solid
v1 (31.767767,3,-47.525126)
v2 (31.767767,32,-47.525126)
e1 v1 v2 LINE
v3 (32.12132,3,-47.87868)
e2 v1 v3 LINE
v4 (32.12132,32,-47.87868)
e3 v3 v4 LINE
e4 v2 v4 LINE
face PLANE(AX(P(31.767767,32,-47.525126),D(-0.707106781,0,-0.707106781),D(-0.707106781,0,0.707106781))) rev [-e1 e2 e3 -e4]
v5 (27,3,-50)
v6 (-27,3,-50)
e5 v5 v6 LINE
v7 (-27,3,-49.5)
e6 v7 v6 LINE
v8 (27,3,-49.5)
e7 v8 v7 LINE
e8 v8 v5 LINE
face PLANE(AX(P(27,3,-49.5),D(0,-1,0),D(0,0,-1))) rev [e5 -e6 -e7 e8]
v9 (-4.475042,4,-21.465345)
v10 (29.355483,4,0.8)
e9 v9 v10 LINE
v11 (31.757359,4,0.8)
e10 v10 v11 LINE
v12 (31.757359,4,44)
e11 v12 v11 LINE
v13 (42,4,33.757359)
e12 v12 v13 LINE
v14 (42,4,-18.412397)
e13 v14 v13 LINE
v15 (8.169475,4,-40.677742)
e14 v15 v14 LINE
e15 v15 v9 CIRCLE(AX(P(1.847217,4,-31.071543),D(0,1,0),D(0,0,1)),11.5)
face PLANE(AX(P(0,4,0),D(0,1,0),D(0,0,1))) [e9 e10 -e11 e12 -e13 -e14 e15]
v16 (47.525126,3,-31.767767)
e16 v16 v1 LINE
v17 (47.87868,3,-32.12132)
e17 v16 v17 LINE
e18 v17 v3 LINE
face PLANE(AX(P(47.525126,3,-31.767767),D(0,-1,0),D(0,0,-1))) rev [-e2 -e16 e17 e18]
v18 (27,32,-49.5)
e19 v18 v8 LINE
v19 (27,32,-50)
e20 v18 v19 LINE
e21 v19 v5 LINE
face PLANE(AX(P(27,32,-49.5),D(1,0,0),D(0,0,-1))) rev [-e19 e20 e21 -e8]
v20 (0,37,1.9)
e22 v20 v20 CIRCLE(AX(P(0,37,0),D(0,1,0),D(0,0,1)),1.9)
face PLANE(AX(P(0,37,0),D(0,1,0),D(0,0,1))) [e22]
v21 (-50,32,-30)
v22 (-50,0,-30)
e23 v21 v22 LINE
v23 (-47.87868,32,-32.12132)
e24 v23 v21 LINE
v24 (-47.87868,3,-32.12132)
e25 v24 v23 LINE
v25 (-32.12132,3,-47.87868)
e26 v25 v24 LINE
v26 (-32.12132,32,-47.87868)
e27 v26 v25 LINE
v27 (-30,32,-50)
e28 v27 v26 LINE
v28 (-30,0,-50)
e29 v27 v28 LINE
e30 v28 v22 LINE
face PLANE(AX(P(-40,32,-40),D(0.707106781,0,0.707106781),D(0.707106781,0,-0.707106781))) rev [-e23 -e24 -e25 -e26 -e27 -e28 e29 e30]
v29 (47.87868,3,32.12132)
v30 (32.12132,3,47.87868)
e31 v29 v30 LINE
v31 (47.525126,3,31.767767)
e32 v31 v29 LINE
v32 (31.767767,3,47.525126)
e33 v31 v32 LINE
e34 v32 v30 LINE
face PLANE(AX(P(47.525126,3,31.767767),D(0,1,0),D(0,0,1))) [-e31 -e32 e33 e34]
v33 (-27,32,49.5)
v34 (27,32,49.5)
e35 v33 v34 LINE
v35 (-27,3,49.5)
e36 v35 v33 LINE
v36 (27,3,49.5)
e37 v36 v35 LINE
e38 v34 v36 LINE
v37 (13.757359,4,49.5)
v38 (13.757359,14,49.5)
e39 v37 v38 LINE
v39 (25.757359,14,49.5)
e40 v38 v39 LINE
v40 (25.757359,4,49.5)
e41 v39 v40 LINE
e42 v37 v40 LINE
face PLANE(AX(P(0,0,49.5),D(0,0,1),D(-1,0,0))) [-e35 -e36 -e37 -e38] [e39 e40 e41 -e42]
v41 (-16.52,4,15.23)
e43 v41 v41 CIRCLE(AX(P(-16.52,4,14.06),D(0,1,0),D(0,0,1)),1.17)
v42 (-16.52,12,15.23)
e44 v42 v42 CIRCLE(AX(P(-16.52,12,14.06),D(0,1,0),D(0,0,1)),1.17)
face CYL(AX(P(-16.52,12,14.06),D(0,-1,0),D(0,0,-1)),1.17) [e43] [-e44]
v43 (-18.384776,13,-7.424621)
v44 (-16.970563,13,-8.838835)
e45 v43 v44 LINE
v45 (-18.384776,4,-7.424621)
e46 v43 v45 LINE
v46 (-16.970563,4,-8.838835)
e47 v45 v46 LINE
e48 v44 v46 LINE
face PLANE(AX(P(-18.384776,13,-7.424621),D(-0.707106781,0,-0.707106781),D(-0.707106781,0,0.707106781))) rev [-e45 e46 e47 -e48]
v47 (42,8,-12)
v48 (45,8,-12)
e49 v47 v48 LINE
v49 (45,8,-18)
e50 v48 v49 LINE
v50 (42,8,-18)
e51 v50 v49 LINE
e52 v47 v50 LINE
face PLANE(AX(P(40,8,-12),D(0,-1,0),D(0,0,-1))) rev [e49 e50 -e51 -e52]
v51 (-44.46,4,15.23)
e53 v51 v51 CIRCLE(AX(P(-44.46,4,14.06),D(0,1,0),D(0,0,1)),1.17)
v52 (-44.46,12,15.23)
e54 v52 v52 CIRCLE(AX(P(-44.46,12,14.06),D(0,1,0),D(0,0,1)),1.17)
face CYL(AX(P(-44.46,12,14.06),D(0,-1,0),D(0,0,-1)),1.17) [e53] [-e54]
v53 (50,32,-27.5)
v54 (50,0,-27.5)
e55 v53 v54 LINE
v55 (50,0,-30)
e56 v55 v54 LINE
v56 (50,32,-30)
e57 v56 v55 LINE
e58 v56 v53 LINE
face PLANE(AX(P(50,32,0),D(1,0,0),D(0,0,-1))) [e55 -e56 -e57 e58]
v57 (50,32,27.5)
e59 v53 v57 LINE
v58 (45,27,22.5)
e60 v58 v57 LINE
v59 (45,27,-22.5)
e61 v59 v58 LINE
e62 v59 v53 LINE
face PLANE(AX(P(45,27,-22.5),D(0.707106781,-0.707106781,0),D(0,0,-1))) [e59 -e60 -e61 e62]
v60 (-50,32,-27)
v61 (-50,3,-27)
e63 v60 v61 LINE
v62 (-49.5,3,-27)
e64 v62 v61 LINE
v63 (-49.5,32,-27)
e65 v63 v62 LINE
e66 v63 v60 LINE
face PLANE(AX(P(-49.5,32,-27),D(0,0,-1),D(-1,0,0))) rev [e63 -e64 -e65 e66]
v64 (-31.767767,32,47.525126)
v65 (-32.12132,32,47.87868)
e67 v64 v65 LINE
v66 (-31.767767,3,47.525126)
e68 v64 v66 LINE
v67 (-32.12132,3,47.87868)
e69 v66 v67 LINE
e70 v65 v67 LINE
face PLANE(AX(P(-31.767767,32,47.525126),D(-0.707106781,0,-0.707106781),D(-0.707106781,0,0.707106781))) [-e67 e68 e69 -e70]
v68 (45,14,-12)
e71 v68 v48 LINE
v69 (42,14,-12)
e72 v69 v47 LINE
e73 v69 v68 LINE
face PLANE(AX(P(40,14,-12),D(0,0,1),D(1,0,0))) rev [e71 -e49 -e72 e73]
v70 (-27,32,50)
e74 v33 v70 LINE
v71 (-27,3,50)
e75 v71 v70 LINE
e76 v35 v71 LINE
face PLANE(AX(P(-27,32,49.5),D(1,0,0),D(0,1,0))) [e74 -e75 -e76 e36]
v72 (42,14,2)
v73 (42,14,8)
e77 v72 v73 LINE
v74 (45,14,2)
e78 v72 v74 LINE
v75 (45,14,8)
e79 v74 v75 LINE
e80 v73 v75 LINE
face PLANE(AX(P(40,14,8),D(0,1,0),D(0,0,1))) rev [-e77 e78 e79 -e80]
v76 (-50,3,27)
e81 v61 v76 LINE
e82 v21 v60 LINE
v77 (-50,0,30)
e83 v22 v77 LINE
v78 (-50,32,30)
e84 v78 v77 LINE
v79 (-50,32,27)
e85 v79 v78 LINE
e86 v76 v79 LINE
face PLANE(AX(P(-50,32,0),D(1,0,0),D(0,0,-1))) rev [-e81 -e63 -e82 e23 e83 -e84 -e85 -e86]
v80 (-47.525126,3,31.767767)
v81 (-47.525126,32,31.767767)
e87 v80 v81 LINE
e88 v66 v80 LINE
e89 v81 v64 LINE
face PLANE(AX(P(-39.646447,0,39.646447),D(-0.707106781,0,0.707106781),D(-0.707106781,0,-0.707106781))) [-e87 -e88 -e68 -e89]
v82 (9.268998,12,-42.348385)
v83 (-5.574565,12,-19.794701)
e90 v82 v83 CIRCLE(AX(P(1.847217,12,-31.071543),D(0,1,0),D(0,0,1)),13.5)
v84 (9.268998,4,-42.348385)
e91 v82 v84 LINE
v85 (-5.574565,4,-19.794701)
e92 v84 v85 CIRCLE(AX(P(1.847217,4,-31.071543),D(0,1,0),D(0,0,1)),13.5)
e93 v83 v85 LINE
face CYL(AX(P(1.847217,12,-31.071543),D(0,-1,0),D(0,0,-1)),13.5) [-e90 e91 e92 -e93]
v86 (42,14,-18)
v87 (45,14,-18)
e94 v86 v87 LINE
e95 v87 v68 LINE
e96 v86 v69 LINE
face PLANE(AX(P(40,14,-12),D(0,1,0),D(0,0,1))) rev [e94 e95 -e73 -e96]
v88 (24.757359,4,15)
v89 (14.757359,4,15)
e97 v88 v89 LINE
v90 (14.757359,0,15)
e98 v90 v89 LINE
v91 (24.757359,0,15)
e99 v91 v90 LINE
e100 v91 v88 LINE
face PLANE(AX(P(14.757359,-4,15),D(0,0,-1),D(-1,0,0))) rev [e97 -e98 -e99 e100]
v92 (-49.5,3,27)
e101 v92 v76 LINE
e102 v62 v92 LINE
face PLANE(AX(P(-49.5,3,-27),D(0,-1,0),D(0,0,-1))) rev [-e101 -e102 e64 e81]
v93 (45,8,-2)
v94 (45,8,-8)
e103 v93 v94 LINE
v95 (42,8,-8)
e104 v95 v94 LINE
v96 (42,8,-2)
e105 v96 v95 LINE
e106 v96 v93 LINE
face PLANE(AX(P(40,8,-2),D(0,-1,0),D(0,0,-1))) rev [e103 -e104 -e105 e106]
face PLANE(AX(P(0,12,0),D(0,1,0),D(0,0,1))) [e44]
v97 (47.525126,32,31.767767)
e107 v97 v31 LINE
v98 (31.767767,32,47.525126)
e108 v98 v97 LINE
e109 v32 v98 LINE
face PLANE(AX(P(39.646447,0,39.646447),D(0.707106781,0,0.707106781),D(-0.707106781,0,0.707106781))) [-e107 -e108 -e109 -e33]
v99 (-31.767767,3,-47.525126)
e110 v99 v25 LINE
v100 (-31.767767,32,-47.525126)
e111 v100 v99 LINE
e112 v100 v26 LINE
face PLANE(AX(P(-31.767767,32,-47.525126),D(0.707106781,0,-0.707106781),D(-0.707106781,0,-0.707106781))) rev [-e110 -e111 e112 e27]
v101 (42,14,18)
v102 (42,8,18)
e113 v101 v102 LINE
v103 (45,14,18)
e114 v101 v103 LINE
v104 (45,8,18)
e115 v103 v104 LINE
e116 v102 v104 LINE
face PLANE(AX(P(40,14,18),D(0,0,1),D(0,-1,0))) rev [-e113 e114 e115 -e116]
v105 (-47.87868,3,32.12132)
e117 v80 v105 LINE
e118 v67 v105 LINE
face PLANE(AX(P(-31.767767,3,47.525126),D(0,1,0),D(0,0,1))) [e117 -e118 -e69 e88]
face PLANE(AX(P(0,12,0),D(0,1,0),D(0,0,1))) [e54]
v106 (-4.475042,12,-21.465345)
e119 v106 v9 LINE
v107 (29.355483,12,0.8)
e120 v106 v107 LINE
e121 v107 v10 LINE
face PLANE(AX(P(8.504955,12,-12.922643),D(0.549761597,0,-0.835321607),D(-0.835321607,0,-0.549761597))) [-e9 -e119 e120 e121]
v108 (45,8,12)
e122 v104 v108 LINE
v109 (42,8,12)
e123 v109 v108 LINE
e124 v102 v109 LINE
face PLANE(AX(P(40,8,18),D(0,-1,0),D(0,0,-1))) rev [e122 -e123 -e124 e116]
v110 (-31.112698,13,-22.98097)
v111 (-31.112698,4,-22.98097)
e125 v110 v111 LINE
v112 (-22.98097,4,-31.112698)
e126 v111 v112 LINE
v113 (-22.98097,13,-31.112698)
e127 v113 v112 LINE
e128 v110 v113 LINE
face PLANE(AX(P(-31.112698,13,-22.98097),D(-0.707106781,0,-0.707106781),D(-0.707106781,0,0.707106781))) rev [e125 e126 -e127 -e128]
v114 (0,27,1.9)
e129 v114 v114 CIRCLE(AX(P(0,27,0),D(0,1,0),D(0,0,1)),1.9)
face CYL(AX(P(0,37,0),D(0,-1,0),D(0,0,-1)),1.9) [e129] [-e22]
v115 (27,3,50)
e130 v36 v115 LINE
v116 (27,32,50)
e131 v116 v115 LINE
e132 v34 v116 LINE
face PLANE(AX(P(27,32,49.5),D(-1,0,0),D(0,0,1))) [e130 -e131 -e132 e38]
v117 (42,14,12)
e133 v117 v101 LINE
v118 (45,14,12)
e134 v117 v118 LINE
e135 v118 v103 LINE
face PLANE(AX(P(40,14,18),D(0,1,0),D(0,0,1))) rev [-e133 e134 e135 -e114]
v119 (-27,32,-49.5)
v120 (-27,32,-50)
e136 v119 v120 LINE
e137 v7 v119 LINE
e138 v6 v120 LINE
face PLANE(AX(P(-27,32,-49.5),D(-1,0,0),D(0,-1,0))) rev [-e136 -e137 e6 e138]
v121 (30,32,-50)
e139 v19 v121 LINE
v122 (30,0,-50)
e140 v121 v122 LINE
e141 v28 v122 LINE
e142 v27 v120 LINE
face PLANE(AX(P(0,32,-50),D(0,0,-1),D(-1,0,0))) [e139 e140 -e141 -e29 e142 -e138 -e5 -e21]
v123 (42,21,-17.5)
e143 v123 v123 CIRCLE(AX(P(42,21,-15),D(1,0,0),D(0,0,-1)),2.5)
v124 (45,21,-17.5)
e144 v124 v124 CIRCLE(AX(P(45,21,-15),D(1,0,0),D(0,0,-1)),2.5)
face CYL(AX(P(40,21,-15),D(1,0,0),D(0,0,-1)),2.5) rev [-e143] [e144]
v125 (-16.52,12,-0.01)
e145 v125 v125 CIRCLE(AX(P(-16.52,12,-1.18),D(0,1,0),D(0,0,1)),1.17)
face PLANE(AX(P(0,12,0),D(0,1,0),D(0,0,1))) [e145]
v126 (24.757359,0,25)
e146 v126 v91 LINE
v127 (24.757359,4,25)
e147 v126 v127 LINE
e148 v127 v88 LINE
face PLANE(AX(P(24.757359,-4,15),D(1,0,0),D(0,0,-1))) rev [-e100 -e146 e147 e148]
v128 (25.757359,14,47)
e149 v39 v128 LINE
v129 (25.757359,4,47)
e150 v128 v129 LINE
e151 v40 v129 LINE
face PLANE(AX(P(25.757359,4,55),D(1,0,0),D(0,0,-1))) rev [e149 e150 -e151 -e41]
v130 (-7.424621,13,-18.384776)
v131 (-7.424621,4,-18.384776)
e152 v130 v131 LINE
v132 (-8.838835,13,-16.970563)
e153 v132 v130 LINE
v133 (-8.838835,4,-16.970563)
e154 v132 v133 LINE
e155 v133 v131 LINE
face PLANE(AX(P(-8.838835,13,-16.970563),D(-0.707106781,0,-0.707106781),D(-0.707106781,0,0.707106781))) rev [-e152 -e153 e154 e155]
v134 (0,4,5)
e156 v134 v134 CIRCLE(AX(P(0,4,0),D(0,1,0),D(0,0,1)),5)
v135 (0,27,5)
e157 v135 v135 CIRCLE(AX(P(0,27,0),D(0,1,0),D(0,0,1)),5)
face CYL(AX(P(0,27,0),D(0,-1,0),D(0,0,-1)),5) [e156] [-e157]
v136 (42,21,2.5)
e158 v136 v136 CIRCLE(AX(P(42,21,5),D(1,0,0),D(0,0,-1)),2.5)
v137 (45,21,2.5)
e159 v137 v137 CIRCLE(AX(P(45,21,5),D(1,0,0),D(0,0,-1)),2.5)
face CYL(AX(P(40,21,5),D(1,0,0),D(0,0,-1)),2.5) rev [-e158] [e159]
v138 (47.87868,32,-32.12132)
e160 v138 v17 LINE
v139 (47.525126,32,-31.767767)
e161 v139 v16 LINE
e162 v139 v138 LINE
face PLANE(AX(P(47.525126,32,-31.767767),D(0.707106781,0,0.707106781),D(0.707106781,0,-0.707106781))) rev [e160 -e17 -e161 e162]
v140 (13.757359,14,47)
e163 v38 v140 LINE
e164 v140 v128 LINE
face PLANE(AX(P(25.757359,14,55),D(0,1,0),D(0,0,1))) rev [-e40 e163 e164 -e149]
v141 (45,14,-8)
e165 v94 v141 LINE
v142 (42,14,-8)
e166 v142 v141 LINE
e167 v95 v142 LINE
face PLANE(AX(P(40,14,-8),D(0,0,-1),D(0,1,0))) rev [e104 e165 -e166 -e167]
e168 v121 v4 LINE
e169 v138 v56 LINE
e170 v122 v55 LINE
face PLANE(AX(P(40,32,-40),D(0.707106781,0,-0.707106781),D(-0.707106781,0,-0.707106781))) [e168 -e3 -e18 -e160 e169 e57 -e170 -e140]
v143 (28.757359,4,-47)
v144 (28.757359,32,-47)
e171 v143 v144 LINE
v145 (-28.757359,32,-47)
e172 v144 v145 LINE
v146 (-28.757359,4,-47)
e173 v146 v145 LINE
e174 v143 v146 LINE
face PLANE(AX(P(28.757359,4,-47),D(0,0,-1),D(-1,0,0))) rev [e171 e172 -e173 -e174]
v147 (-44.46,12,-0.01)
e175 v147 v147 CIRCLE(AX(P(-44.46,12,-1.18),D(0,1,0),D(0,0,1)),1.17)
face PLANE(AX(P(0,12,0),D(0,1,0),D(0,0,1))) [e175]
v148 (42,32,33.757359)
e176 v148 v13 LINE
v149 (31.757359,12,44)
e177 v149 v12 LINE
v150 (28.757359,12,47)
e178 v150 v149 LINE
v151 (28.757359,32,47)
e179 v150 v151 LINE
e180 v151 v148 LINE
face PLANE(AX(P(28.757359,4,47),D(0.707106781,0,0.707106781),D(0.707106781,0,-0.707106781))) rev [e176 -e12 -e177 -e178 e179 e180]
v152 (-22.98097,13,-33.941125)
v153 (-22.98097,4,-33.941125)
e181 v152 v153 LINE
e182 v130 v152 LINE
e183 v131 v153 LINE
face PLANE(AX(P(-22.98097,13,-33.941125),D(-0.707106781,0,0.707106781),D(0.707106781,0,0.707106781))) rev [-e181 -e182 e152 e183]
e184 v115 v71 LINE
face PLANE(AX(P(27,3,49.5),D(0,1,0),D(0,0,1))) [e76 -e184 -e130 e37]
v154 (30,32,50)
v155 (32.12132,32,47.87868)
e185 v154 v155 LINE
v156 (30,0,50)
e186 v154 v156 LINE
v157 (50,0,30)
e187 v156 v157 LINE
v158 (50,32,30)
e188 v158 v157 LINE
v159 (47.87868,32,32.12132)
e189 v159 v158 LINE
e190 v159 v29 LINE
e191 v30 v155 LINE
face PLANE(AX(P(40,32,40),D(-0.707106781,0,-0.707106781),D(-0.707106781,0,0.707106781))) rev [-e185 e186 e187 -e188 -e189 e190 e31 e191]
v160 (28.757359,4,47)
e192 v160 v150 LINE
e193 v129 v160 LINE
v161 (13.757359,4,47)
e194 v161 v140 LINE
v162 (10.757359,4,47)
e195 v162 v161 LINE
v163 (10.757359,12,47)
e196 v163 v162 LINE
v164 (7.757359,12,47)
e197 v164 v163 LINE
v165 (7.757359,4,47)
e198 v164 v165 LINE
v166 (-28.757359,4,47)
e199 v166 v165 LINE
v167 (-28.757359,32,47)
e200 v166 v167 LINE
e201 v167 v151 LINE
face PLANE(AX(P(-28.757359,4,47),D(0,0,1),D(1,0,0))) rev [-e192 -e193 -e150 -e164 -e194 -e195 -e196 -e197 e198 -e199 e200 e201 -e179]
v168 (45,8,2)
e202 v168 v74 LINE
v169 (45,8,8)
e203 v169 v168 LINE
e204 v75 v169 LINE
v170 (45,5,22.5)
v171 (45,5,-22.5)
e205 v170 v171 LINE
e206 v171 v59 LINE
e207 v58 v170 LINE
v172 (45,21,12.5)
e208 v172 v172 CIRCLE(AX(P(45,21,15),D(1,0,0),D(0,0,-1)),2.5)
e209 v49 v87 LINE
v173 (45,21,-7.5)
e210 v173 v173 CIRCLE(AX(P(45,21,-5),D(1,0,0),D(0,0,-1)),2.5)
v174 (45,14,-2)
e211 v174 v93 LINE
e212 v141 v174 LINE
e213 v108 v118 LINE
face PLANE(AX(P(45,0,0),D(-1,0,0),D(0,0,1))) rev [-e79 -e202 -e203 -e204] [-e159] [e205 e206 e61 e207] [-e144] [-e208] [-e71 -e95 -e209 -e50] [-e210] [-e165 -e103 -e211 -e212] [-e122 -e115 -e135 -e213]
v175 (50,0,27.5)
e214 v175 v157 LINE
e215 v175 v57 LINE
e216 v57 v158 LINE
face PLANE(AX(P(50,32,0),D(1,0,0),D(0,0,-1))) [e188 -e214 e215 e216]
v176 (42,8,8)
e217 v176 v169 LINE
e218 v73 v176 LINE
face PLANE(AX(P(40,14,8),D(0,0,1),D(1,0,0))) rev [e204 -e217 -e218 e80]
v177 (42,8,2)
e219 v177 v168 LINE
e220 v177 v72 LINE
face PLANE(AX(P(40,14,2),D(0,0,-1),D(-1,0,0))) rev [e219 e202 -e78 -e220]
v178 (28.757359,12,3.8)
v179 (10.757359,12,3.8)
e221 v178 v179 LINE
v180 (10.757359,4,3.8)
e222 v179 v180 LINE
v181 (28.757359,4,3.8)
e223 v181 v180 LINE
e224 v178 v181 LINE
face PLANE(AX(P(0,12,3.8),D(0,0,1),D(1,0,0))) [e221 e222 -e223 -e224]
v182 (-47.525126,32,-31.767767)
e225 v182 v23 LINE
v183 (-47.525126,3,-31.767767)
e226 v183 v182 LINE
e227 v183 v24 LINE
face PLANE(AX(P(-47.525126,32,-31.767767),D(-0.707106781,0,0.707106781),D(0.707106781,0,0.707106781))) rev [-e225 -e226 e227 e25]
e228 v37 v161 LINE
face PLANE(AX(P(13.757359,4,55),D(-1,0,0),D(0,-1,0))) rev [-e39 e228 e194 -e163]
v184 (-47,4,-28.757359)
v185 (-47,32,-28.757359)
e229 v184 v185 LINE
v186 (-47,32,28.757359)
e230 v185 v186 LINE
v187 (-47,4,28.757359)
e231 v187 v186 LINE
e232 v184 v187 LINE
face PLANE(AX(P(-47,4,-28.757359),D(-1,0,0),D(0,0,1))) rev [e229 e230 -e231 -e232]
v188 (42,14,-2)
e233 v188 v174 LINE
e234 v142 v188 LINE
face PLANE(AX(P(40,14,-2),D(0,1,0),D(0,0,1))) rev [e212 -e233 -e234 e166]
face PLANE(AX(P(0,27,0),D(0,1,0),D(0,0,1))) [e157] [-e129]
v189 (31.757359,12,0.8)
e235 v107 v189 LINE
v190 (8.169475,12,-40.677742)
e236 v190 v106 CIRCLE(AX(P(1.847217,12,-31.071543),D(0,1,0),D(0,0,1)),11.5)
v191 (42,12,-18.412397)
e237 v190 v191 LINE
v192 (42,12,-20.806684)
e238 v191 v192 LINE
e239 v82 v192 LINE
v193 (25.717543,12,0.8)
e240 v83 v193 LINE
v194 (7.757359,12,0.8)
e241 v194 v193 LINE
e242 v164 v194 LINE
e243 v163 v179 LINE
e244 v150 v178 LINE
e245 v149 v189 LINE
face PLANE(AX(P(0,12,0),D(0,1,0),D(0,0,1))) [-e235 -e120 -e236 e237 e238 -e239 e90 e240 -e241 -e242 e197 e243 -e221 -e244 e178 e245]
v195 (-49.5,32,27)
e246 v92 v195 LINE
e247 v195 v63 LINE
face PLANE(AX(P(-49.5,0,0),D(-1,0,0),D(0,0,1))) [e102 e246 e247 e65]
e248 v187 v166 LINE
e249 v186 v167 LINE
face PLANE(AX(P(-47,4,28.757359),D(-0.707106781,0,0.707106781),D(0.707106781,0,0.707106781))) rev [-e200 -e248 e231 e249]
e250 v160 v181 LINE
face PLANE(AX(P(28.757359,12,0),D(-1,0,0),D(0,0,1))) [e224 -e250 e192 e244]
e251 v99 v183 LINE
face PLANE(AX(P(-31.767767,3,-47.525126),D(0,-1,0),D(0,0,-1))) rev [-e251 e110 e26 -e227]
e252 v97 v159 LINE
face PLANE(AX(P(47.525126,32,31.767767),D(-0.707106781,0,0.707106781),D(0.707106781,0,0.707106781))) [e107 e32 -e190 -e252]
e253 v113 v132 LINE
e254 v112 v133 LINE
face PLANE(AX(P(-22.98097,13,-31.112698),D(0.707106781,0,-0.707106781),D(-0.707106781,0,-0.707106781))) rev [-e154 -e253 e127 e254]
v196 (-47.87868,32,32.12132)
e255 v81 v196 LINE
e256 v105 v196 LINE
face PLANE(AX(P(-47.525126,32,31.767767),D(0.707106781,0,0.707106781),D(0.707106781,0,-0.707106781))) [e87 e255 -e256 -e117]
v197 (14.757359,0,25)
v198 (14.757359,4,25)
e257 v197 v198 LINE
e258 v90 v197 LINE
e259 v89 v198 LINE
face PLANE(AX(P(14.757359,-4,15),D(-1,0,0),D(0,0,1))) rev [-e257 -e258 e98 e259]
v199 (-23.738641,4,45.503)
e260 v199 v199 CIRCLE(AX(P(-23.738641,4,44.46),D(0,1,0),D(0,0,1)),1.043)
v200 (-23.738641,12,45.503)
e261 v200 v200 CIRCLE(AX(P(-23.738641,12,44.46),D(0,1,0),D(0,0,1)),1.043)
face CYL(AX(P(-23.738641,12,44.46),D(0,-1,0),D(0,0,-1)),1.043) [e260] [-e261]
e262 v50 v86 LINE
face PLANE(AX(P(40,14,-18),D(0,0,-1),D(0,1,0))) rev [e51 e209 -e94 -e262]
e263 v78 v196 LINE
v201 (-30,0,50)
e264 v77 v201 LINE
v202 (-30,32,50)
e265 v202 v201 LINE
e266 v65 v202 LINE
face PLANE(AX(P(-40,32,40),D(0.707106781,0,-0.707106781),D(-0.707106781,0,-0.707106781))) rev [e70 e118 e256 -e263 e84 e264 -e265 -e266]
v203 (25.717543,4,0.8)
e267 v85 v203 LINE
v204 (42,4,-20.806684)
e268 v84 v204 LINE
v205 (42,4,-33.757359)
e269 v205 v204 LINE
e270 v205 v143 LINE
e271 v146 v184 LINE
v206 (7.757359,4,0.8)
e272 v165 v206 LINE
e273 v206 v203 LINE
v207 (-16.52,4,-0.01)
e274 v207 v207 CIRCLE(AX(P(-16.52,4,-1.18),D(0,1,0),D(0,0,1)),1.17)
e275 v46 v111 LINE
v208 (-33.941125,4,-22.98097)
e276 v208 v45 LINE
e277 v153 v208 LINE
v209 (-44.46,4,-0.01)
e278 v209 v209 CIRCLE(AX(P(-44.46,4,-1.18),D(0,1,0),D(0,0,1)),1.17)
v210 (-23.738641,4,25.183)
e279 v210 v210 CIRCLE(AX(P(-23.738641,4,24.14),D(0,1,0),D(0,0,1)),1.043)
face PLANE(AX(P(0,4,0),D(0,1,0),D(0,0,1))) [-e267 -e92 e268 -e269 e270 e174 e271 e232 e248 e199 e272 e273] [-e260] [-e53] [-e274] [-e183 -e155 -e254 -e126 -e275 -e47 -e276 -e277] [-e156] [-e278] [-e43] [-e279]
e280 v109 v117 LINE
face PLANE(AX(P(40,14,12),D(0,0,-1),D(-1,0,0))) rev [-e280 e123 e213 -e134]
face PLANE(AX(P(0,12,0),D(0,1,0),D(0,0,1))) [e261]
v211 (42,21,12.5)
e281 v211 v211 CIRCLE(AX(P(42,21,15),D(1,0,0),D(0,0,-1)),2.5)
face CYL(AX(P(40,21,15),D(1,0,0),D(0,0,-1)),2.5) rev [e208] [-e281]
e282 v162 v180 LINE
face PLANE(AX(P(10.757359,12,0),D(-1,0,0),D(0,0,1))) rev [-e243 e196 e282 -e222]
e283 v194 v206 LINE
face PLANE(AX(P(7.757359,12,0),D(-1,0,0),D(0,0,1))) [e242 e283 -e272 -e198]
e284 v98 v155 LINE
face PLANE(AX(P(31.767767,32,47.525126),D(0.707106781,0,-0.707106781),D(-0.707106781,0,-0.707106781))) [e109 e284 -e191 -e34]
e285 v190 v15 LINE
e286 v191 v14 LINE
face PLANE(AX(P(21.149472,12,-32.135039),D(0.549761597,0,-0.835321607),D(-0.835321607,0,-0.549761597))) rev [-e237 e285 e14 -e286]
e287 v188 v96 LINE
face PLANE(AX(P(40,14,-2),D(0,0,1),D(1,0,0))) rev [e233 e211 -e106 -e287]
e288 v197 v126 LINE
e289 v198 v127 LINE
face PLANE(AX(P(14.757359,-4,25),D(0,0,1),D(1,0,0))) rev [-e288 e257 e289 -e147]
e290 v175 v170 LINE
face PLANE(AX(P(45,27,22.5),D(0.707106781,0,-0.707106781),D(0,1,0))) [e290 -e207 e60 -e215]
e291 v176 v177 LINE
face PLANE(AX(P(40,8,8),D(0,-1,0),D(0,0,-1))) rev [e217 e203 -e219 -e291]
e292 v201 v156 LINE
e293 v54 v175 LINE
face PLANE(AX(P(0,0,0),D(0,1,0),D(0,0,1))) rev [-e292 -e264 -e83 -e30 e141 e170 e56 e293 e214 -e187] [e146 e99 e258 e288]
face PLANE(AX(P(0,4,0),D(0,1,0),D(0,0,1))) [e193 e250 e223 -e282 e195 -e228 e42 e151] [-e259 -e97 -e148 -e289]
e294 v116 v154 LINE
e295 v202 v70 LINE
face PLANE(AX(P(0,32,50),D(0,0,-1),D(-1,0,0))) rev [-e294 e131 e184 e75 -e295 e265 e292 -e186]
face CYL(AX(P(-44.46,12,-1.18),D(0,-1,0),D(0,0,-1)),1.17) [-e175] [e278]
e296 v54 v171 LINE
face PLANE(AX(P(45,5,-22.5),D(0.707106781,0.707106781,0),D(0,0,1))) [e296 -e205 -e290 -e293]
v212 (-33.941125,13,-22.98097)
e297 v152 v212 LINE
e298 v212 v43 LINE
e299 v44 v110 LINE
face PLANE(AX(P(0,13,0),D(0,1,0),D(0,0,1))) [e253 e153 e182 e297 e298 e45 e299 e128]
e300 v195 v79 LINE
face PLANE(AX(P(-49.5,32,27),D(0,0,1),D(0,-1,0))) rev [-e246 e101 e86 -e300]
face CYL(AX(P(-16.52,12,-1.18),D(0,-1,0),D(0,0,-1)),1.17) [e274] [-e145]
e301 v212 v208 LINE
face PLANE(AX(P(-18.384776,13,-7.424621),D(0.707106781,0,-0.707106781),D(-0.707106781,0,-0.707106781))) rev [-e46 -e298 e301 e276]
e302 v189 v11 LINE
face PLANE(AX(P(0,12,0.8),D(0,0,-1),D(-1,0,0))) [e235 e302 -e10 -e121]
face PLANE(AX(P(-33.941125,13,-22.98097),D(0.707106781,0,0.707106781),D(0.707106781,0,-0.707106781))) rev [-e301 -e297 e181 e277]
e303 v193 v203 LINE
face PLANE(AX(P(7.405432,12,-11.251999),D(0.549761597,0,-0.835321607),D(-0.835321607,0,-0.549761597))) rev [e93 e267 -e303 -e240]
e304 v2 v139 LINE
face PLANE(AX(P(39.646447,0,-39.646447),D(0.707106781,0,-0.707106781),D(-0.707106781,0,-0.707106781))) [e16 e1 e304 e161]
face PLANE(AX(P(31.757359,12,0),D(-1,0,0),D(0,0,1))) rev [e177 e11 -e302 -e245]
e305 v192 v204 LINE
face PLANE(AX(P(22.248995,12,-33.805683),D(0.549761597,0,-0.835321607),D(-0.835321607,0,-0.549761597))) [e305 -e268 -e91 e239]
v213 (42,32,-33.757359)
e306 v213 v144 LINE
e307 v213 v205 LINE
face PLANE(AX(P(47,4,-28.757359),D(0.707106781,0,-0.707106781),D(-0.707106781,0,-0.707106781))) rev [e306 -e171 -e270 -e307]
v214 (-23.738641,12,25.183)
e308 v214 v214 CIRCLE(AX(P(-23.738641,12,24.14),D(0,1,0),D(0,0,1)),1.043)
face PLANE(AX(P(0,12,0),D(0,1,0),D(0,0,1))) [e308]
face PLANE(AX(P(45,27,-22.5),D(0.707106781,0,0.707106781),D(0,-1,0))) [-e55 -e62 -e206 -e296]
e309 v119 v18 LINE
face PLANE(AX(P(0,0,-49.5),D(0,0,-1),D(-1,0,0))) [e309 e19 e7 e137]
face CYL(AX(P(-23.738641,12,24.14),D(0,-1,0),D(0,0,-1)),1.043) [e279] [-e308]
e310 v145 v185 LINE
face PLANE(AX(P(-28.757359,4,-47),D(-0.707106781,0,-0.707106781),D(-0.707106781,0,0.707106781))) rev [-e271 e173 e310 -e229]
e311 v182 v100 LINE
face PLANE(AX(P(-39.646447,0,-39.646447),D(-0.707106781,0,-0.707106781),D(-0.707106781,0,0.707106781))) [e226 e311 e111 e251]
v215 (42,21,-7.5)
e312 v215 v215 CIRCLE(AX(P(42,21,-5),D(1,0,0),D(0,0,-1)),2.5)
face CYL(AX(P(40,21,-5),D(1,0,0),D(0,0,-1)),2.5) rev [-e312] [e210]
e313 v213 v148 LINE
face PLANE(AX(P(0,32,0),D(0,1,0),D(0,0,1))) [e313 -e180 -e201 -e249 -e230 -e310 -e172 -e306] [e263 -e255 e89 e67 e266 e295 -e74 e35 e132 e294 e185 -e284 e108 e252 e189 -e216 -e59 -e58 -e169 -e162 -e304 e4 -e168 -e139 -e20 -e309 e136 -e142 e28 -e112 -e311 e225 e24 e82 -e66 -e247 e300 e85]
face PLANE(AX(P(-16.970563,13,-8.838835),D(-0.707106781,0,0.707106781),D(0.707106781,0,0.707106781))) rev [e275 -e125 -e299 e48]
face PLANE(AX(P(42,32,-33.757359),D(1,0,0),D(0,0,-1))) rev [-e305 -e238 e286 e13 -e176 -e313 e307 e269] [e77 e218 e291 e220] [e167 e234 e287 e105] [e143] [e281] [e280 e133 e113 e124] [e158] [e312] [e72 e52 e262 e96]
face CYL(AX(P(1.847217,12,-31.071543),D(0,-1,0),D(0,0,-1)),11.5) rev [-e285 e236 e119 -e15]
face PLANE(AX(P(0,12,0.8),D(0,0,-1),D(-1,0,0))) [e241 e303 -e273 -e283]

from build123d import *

# Parameters (mm, degrees)
BOSS_EXTRUDE1_DEPTH = 32
CUT_EXTRUDE1_DEPTH  = 28
SKETCH3_R           = 5
BOSS_EXTRUDE2_DEPTH = 23
SKETCH4_R           = 1.9
BOSS_EXTRUDE3_DEPTH = 10
BOSS_EXTRUDE4_DEPTH = 9
BOSS_EXTRUDE6_DEPTH = 28
SKETCH7_W           = 45
SKETCH7_H           = 22
CUT_EXTRUDE2_DEPTH  = 5
CHAMFER1_SIZE       = 5
SKETCH8_R           = 2.5
SKETCH8_W           = 6
SKETCH8_H           = 6
CUT_EXTRUDE3_DEPTH  = 5
SKETCH10_R          = 1.17
SKETCH10_R_2        = 1.043
BOSS_EXTRUDE8_DEPTH = 8
SKETCH11_W          = 12
SKETCH11_H          = 10
CUT_EXTRUDE4_DEPTH  = 8
SKETCH12_W          = 10
SKETCH12_H          = 10
CUT_EXTRUDE5_DEPTH  = 8
SKETCH16_W          = 22.284271248
SKETCH16_H          = 29
CUT_EXTRUDE6_DEPTH  = 0.5
SKETCH17_W          = 54
SKETCH17_H          = 29
CUT_EXTRUDE7_DEPTH  = 0.5
SKETCH18_W          = 22.284271248
SKETCH18_H          = 29
CUT_EXTRUDE8_DEPTH  = 0.5
SKETCH19_W          = 54
SKETCH19_H          = 29
CUT_EXTRUDE9_DEPTH  = 0.5


with BuildPart() as part:
    # Sketch1 → Boss-Extrude1 (new body)
    with BuildSketch(Plane(origin=(0, 0, 0), x_dir=(1, 0, 0), z_dir=(0, 1, 0))):
        Polygon((30, 50), (-30, 50), (-50, 30), (-50, -30), (-30, -50), (30, -50), (50, -30), (50, 30), align=None)
    extrude(amount=BOSS_EXTRUDE1_DEPTH)

    # Sketch2 → Cut-Extrude1 (cut)
    with BuildSketch(Plane(origin=(0, 32, 0), x_dir=(1, 0, 0), z_dir=(0, 1, 0))):
        Polygon((-28.757359313, -47), (28.757359313, -47), (47, -28.757359313), (47, 28.757359313), (28.757359313, 47), (-28.757359313, 47), (-47, 28.757359313), (-47, -28.757359313), align=None)
    extrude(amount=-CUT_EXTRUDE1_DEPTH, mode=Mode.SUBTRACT)

    # Sketch3 → Boss-Extrude2 (add)
    with BuildSketch(Plane(origin=(0, 4, 0), x_dir=(1, 0, 0), z_dir=(0, 1, 0))):
        with Locations(Location((0, 0, 0), (0, 0, 270))):
            Circle(SKETCH3_R)
    extrude(amount=BOSS_EXTRUDE2_DEPTH)

    # Sketch4 → Boss-Extrude3 (add)
    with BuildSketch(Plane(origin=(0, 27, 0), x_dir=(1, 0, 0), z_dir=(0, 1, 0))):
        with Locations(Location((0, 0, 0), (0, 0, 270))):
            Circle(SKETCH4_R)
    extrude(amount=BOSS_EXTRUDE3_DEPTH)

    # Sketch5 → Boss-Extrude4 (add)
    with BuildSketch(Plane(origin=(0, 4, 0), x_dir=(1, 0, 0), z_dir=(0, 1, 0))):
        Polygon((-16.970562748, 8.838834765), (-31.112698372, 22.980970389), (-22.980970389, 31.112698372), (-8.838834765, 16.970562748), (-7.424621202, 18.384776311), (-22.980970389, 33.941125497), (-33.941125497, 22.980970389), (-18.384776311, 7.424621202), align=None)
    extrude(amount=BOSS_EXTRUDE4_DEPTH)

    # Sketch6 → Boss-Extrude6 (add)
    with BuildSketch(Plane(origin=(0, 4, 0), x_dir=(1, 0, 0), z_dir=(0, 1, 0))):
        Polygon((42, -33.757359313), (47, -28.757359313), (47, 28.757359313), (42, 33.757359313), align=None)
    extrude(amount=BOSS_EXTRUDE6_DEPTH)

    # Sketch7 → Cut-Extrude2 (cut)
    with BuildSketch(Plane(origin=(50, 0, 0), x_dir=(0, 0, -1), z_dir=(1, 0, 0))):
        with Locations((0, 16)):
            Rectangle(SKETCH7_W, SKETCH7_H)
    extrude(amount=-CUT_EXTRUDE2_DEPTH, mode=Mode.SUBTRACT)

    # Chamfer1
    chamfer1_edges = [part.edges().sort_by_distance(p)[0] for p in [
        (50, 16, 22.5),
        (50, 27, 0),
        (50, 16, -22.5),
        (50, 5, 0),
    ]]
    chamfer(chamfer1_edges, length=CHAMFER1_SIZE - 0.0001)  # a hair under: the kernel refuses the full size

    # Sketch8 → Cut-Extrude3 (cut)
    with BuildSketch(Plane(origin=(45, 0, 0), x_dir=(0, 0, -1), z_dir=(1, 0, 0))):
        with Locations((-15, 21)):
            Circle(SKETCH8_R)
        with Locations((-5, 21)):
            Circle(SKETCH8_R)
        with Locations((5, 21)):
            Circle(SKETCH8_R)
        with Locations((15, 21)):
            Circle(SKETCH8_R)
        with Locations((-15, 11)):
            Rectangle(SKETCH8_W, SKETCH8_H)
        with Locations((-5, 11)):
            Rectangle(SKETCH8_W, SKETCH8_H)
        with Locations((5, 11)):
            Rectangle(SKETCH8_W, SKETCH8_H)
        with Locations((15, 11)):
            Rectangle(SKETCH8_W, SKETCH8_H)
    extrude(amount=-CUT_EXTRUDE3_DEPTH, mode=Mode.SUBTRACT)

    # Sketch10 → Boss-Extrude8 (add)
    with BuildSketch(Plane(origin=(0, 4, 0), x_dir=(1, 0, 0), z_dir=(0, 1, 0))):
        with Locations(Location((-44.46, -14.06, 0), (0, 0, 270))):
            Circle(SKETCH10_R)
        with Locations(Location((-44.46, 1.18, 0), (0, 0, 270))):
            Circle(SKETCH10_R)
        with Locations(Location((-16.52, 1.18, 0), (0, 0, 270))):
            Circle(SKETCH10_R)
        with Locations(Location((-16.52, -14.06, 0), (0, 0, 270))):
            Circle(SKETCH10_R)
        with Locations(Location((-23.738640687, -44.46, 0), (0, 0, 270))):
            Circle(SKETCH10_R_2)
        with Locations(Location((-23.738640687, -24.14, 0), (0, 0, 270))):
            Circle(SKETCH10_R_2)
        Polygon((28.757359313, -3.8), (28.757359313, -47), (31.757359313, -44), (31.757359313, -0.8), (29.355483266, -0.8), (25.717542729, -0.8), (7.757359313, -0.8), (7.757359313, -21.6), (7.757359313, -47), (10.757359313, -47), (10.757359313, -3.8), align=None)
        with BuildLine():
            Line((25.717542729, -0.8), (29.355483266, -0.8))
            Line((29.355483266, -0.8), (-4.475041798, 21.465344683))
            ThreePointArc((-4.475041798, 21.465344683), (-7.758981907, 37.393801525), (8.169474935, 40.677741633))
            Line((8.169474935, 40.677741633), (42, 18.41239695))
            Line((42, 18.41239695), (42, 20.806684353))
            Line((42, 20.806684353), (9.26899813, 42.348384846))
            ThreePointArc((9.26899813, 42.348384846), (5.919661645, 43.942642222), (2.262859211, 44.565143167))
            ThreePointArc((2.262859211, 44.565143167), (-0.878722589, 44.293466456), (-3.871580373, 43.300417249))
            ThreePointArc((-3.871580373, 43.300417249), (-6.983976281, 41.282323386), (-9.429625069, 38.493324796))
            ThreePointArc((-9.429625069, 38.493324796), (-11.023882481, 35.143988278), (-11.64638344, 31.4871858))
            ThreePointArc((-11.64638344, 31.4871858), (-11.37470673, 28.345604), (-10.381657523, 25.352746216))
            ThreePointArc((-10.381657523, 25.352746216), (-8.363563629, 22.240350274), (-5.574564992, 19.79470147))
            Line((-5.574564992, 19.79470147), (25.717542729, -0.8))
        make_face()
    extrude(amount=BOSS_EXTRUDE8_DEPTH)

    # Sketch11 → Cut-Extrude4 (cut)
    with BuildSketch(Plane(origin=(0, 0, 47), x_dir=(-1, 0, 0), z_dir=(0, 0, -1))):
        with Locations((-19.757359313, 9)):
            Rectangle(SKETCH11_W, SKETCH11_H)
    extrude(amount=-CUT_EXTRUDE4_DEPTH, mode=Mode.SUBTRACT)

    # Sketch12 → Cut-Extrude5 (cut)
    with BuildSketch(Plane(origin=(0, 4, 0), x_dir=(1, 0, 0), z_dir=(0, 1, 0))):
        with Locations((19.757359313, -20)):
            Rectangle(SKETCH12_W, SKETCH12_H)
    extrude(amount=-CUT_EXTRUDE5_DEPTH, mode=Mode.SUBTRACT)

    # Sketch16 → Cut-Extrude6 (cut)
    with BuildSketch(Plane(origin=(-40, 0, -40), x_dir=(-0.7071067811865475, 0, 0.7071067811865477), z_dir=(-0.7071067811865477, 0, -0.7071067811865475))):
        with Locations((0, 17.5)):
            Rectangle(SKETCH16_W, SKETCH16_H)
    cut_extrude6 = extrude(amount=-CUT_EXTRUDE6_DEPTH, mode=Mode.SUBTRACT)

    # Sketch17 → Cut-Extrude7 (cut)
    with BuildSketch(Plane(origin=(0, 0, -50), x_dir=(-1, 0, 0), z_dir=(0, 0, -1))):
        with Locations((0, 17.5)):
            Rectangle(SKETCH17_W, SKETCH17_H)
    cut_extrude7 = extrude(amount=-CUT_EXTRUDE7_DEPTH, mode=Mode.SUBTRACT)

    # Sketch18 → Cut-Extrude8 (cut)
    with BuildSketch(Plane(origin=(40, 0, -40), x_dir=(-0.7071067811865475, 0, -0.7071067811865477), z_dir=(0.7071067811865477, 0, -0.7071067811865475))):
        with Locations((0, 17.5)):
            Rectangle(SKETCH18_W, SKETCH18_H)
    cut_extrude8 = extrude(amount=-CUT_EXTRUDE8_DEPTH, mode=Mode.SUBTRACT)

    # Mirror1: Cut-Extrude6, Cut-Extrude7, Cut-Extrude8 across plane
    add(cut_extrude6.mirror(Plane.XY), mode=Mode.SUBTRACT)
    add(cut_extrude7.mirror(Plane.XY), mode=Mode.SUBTRACT)
    add(cut_extrude8.mirror(Plane.XY), mode=Mode.SUBTRACT)

    # Sketch19 → Cut-Extrude9 (cut)
    with BuildSketch(Plane.ZY.offset(50)):
        with Locations((0, 17.5)):
            Rectangle(SKETCH19_W, SKETCH19_H)
    extrude(amount=-CUT_EXTRUDE9_DEPTH, mode=Mode.SUBTRACT)


solid = part.part
